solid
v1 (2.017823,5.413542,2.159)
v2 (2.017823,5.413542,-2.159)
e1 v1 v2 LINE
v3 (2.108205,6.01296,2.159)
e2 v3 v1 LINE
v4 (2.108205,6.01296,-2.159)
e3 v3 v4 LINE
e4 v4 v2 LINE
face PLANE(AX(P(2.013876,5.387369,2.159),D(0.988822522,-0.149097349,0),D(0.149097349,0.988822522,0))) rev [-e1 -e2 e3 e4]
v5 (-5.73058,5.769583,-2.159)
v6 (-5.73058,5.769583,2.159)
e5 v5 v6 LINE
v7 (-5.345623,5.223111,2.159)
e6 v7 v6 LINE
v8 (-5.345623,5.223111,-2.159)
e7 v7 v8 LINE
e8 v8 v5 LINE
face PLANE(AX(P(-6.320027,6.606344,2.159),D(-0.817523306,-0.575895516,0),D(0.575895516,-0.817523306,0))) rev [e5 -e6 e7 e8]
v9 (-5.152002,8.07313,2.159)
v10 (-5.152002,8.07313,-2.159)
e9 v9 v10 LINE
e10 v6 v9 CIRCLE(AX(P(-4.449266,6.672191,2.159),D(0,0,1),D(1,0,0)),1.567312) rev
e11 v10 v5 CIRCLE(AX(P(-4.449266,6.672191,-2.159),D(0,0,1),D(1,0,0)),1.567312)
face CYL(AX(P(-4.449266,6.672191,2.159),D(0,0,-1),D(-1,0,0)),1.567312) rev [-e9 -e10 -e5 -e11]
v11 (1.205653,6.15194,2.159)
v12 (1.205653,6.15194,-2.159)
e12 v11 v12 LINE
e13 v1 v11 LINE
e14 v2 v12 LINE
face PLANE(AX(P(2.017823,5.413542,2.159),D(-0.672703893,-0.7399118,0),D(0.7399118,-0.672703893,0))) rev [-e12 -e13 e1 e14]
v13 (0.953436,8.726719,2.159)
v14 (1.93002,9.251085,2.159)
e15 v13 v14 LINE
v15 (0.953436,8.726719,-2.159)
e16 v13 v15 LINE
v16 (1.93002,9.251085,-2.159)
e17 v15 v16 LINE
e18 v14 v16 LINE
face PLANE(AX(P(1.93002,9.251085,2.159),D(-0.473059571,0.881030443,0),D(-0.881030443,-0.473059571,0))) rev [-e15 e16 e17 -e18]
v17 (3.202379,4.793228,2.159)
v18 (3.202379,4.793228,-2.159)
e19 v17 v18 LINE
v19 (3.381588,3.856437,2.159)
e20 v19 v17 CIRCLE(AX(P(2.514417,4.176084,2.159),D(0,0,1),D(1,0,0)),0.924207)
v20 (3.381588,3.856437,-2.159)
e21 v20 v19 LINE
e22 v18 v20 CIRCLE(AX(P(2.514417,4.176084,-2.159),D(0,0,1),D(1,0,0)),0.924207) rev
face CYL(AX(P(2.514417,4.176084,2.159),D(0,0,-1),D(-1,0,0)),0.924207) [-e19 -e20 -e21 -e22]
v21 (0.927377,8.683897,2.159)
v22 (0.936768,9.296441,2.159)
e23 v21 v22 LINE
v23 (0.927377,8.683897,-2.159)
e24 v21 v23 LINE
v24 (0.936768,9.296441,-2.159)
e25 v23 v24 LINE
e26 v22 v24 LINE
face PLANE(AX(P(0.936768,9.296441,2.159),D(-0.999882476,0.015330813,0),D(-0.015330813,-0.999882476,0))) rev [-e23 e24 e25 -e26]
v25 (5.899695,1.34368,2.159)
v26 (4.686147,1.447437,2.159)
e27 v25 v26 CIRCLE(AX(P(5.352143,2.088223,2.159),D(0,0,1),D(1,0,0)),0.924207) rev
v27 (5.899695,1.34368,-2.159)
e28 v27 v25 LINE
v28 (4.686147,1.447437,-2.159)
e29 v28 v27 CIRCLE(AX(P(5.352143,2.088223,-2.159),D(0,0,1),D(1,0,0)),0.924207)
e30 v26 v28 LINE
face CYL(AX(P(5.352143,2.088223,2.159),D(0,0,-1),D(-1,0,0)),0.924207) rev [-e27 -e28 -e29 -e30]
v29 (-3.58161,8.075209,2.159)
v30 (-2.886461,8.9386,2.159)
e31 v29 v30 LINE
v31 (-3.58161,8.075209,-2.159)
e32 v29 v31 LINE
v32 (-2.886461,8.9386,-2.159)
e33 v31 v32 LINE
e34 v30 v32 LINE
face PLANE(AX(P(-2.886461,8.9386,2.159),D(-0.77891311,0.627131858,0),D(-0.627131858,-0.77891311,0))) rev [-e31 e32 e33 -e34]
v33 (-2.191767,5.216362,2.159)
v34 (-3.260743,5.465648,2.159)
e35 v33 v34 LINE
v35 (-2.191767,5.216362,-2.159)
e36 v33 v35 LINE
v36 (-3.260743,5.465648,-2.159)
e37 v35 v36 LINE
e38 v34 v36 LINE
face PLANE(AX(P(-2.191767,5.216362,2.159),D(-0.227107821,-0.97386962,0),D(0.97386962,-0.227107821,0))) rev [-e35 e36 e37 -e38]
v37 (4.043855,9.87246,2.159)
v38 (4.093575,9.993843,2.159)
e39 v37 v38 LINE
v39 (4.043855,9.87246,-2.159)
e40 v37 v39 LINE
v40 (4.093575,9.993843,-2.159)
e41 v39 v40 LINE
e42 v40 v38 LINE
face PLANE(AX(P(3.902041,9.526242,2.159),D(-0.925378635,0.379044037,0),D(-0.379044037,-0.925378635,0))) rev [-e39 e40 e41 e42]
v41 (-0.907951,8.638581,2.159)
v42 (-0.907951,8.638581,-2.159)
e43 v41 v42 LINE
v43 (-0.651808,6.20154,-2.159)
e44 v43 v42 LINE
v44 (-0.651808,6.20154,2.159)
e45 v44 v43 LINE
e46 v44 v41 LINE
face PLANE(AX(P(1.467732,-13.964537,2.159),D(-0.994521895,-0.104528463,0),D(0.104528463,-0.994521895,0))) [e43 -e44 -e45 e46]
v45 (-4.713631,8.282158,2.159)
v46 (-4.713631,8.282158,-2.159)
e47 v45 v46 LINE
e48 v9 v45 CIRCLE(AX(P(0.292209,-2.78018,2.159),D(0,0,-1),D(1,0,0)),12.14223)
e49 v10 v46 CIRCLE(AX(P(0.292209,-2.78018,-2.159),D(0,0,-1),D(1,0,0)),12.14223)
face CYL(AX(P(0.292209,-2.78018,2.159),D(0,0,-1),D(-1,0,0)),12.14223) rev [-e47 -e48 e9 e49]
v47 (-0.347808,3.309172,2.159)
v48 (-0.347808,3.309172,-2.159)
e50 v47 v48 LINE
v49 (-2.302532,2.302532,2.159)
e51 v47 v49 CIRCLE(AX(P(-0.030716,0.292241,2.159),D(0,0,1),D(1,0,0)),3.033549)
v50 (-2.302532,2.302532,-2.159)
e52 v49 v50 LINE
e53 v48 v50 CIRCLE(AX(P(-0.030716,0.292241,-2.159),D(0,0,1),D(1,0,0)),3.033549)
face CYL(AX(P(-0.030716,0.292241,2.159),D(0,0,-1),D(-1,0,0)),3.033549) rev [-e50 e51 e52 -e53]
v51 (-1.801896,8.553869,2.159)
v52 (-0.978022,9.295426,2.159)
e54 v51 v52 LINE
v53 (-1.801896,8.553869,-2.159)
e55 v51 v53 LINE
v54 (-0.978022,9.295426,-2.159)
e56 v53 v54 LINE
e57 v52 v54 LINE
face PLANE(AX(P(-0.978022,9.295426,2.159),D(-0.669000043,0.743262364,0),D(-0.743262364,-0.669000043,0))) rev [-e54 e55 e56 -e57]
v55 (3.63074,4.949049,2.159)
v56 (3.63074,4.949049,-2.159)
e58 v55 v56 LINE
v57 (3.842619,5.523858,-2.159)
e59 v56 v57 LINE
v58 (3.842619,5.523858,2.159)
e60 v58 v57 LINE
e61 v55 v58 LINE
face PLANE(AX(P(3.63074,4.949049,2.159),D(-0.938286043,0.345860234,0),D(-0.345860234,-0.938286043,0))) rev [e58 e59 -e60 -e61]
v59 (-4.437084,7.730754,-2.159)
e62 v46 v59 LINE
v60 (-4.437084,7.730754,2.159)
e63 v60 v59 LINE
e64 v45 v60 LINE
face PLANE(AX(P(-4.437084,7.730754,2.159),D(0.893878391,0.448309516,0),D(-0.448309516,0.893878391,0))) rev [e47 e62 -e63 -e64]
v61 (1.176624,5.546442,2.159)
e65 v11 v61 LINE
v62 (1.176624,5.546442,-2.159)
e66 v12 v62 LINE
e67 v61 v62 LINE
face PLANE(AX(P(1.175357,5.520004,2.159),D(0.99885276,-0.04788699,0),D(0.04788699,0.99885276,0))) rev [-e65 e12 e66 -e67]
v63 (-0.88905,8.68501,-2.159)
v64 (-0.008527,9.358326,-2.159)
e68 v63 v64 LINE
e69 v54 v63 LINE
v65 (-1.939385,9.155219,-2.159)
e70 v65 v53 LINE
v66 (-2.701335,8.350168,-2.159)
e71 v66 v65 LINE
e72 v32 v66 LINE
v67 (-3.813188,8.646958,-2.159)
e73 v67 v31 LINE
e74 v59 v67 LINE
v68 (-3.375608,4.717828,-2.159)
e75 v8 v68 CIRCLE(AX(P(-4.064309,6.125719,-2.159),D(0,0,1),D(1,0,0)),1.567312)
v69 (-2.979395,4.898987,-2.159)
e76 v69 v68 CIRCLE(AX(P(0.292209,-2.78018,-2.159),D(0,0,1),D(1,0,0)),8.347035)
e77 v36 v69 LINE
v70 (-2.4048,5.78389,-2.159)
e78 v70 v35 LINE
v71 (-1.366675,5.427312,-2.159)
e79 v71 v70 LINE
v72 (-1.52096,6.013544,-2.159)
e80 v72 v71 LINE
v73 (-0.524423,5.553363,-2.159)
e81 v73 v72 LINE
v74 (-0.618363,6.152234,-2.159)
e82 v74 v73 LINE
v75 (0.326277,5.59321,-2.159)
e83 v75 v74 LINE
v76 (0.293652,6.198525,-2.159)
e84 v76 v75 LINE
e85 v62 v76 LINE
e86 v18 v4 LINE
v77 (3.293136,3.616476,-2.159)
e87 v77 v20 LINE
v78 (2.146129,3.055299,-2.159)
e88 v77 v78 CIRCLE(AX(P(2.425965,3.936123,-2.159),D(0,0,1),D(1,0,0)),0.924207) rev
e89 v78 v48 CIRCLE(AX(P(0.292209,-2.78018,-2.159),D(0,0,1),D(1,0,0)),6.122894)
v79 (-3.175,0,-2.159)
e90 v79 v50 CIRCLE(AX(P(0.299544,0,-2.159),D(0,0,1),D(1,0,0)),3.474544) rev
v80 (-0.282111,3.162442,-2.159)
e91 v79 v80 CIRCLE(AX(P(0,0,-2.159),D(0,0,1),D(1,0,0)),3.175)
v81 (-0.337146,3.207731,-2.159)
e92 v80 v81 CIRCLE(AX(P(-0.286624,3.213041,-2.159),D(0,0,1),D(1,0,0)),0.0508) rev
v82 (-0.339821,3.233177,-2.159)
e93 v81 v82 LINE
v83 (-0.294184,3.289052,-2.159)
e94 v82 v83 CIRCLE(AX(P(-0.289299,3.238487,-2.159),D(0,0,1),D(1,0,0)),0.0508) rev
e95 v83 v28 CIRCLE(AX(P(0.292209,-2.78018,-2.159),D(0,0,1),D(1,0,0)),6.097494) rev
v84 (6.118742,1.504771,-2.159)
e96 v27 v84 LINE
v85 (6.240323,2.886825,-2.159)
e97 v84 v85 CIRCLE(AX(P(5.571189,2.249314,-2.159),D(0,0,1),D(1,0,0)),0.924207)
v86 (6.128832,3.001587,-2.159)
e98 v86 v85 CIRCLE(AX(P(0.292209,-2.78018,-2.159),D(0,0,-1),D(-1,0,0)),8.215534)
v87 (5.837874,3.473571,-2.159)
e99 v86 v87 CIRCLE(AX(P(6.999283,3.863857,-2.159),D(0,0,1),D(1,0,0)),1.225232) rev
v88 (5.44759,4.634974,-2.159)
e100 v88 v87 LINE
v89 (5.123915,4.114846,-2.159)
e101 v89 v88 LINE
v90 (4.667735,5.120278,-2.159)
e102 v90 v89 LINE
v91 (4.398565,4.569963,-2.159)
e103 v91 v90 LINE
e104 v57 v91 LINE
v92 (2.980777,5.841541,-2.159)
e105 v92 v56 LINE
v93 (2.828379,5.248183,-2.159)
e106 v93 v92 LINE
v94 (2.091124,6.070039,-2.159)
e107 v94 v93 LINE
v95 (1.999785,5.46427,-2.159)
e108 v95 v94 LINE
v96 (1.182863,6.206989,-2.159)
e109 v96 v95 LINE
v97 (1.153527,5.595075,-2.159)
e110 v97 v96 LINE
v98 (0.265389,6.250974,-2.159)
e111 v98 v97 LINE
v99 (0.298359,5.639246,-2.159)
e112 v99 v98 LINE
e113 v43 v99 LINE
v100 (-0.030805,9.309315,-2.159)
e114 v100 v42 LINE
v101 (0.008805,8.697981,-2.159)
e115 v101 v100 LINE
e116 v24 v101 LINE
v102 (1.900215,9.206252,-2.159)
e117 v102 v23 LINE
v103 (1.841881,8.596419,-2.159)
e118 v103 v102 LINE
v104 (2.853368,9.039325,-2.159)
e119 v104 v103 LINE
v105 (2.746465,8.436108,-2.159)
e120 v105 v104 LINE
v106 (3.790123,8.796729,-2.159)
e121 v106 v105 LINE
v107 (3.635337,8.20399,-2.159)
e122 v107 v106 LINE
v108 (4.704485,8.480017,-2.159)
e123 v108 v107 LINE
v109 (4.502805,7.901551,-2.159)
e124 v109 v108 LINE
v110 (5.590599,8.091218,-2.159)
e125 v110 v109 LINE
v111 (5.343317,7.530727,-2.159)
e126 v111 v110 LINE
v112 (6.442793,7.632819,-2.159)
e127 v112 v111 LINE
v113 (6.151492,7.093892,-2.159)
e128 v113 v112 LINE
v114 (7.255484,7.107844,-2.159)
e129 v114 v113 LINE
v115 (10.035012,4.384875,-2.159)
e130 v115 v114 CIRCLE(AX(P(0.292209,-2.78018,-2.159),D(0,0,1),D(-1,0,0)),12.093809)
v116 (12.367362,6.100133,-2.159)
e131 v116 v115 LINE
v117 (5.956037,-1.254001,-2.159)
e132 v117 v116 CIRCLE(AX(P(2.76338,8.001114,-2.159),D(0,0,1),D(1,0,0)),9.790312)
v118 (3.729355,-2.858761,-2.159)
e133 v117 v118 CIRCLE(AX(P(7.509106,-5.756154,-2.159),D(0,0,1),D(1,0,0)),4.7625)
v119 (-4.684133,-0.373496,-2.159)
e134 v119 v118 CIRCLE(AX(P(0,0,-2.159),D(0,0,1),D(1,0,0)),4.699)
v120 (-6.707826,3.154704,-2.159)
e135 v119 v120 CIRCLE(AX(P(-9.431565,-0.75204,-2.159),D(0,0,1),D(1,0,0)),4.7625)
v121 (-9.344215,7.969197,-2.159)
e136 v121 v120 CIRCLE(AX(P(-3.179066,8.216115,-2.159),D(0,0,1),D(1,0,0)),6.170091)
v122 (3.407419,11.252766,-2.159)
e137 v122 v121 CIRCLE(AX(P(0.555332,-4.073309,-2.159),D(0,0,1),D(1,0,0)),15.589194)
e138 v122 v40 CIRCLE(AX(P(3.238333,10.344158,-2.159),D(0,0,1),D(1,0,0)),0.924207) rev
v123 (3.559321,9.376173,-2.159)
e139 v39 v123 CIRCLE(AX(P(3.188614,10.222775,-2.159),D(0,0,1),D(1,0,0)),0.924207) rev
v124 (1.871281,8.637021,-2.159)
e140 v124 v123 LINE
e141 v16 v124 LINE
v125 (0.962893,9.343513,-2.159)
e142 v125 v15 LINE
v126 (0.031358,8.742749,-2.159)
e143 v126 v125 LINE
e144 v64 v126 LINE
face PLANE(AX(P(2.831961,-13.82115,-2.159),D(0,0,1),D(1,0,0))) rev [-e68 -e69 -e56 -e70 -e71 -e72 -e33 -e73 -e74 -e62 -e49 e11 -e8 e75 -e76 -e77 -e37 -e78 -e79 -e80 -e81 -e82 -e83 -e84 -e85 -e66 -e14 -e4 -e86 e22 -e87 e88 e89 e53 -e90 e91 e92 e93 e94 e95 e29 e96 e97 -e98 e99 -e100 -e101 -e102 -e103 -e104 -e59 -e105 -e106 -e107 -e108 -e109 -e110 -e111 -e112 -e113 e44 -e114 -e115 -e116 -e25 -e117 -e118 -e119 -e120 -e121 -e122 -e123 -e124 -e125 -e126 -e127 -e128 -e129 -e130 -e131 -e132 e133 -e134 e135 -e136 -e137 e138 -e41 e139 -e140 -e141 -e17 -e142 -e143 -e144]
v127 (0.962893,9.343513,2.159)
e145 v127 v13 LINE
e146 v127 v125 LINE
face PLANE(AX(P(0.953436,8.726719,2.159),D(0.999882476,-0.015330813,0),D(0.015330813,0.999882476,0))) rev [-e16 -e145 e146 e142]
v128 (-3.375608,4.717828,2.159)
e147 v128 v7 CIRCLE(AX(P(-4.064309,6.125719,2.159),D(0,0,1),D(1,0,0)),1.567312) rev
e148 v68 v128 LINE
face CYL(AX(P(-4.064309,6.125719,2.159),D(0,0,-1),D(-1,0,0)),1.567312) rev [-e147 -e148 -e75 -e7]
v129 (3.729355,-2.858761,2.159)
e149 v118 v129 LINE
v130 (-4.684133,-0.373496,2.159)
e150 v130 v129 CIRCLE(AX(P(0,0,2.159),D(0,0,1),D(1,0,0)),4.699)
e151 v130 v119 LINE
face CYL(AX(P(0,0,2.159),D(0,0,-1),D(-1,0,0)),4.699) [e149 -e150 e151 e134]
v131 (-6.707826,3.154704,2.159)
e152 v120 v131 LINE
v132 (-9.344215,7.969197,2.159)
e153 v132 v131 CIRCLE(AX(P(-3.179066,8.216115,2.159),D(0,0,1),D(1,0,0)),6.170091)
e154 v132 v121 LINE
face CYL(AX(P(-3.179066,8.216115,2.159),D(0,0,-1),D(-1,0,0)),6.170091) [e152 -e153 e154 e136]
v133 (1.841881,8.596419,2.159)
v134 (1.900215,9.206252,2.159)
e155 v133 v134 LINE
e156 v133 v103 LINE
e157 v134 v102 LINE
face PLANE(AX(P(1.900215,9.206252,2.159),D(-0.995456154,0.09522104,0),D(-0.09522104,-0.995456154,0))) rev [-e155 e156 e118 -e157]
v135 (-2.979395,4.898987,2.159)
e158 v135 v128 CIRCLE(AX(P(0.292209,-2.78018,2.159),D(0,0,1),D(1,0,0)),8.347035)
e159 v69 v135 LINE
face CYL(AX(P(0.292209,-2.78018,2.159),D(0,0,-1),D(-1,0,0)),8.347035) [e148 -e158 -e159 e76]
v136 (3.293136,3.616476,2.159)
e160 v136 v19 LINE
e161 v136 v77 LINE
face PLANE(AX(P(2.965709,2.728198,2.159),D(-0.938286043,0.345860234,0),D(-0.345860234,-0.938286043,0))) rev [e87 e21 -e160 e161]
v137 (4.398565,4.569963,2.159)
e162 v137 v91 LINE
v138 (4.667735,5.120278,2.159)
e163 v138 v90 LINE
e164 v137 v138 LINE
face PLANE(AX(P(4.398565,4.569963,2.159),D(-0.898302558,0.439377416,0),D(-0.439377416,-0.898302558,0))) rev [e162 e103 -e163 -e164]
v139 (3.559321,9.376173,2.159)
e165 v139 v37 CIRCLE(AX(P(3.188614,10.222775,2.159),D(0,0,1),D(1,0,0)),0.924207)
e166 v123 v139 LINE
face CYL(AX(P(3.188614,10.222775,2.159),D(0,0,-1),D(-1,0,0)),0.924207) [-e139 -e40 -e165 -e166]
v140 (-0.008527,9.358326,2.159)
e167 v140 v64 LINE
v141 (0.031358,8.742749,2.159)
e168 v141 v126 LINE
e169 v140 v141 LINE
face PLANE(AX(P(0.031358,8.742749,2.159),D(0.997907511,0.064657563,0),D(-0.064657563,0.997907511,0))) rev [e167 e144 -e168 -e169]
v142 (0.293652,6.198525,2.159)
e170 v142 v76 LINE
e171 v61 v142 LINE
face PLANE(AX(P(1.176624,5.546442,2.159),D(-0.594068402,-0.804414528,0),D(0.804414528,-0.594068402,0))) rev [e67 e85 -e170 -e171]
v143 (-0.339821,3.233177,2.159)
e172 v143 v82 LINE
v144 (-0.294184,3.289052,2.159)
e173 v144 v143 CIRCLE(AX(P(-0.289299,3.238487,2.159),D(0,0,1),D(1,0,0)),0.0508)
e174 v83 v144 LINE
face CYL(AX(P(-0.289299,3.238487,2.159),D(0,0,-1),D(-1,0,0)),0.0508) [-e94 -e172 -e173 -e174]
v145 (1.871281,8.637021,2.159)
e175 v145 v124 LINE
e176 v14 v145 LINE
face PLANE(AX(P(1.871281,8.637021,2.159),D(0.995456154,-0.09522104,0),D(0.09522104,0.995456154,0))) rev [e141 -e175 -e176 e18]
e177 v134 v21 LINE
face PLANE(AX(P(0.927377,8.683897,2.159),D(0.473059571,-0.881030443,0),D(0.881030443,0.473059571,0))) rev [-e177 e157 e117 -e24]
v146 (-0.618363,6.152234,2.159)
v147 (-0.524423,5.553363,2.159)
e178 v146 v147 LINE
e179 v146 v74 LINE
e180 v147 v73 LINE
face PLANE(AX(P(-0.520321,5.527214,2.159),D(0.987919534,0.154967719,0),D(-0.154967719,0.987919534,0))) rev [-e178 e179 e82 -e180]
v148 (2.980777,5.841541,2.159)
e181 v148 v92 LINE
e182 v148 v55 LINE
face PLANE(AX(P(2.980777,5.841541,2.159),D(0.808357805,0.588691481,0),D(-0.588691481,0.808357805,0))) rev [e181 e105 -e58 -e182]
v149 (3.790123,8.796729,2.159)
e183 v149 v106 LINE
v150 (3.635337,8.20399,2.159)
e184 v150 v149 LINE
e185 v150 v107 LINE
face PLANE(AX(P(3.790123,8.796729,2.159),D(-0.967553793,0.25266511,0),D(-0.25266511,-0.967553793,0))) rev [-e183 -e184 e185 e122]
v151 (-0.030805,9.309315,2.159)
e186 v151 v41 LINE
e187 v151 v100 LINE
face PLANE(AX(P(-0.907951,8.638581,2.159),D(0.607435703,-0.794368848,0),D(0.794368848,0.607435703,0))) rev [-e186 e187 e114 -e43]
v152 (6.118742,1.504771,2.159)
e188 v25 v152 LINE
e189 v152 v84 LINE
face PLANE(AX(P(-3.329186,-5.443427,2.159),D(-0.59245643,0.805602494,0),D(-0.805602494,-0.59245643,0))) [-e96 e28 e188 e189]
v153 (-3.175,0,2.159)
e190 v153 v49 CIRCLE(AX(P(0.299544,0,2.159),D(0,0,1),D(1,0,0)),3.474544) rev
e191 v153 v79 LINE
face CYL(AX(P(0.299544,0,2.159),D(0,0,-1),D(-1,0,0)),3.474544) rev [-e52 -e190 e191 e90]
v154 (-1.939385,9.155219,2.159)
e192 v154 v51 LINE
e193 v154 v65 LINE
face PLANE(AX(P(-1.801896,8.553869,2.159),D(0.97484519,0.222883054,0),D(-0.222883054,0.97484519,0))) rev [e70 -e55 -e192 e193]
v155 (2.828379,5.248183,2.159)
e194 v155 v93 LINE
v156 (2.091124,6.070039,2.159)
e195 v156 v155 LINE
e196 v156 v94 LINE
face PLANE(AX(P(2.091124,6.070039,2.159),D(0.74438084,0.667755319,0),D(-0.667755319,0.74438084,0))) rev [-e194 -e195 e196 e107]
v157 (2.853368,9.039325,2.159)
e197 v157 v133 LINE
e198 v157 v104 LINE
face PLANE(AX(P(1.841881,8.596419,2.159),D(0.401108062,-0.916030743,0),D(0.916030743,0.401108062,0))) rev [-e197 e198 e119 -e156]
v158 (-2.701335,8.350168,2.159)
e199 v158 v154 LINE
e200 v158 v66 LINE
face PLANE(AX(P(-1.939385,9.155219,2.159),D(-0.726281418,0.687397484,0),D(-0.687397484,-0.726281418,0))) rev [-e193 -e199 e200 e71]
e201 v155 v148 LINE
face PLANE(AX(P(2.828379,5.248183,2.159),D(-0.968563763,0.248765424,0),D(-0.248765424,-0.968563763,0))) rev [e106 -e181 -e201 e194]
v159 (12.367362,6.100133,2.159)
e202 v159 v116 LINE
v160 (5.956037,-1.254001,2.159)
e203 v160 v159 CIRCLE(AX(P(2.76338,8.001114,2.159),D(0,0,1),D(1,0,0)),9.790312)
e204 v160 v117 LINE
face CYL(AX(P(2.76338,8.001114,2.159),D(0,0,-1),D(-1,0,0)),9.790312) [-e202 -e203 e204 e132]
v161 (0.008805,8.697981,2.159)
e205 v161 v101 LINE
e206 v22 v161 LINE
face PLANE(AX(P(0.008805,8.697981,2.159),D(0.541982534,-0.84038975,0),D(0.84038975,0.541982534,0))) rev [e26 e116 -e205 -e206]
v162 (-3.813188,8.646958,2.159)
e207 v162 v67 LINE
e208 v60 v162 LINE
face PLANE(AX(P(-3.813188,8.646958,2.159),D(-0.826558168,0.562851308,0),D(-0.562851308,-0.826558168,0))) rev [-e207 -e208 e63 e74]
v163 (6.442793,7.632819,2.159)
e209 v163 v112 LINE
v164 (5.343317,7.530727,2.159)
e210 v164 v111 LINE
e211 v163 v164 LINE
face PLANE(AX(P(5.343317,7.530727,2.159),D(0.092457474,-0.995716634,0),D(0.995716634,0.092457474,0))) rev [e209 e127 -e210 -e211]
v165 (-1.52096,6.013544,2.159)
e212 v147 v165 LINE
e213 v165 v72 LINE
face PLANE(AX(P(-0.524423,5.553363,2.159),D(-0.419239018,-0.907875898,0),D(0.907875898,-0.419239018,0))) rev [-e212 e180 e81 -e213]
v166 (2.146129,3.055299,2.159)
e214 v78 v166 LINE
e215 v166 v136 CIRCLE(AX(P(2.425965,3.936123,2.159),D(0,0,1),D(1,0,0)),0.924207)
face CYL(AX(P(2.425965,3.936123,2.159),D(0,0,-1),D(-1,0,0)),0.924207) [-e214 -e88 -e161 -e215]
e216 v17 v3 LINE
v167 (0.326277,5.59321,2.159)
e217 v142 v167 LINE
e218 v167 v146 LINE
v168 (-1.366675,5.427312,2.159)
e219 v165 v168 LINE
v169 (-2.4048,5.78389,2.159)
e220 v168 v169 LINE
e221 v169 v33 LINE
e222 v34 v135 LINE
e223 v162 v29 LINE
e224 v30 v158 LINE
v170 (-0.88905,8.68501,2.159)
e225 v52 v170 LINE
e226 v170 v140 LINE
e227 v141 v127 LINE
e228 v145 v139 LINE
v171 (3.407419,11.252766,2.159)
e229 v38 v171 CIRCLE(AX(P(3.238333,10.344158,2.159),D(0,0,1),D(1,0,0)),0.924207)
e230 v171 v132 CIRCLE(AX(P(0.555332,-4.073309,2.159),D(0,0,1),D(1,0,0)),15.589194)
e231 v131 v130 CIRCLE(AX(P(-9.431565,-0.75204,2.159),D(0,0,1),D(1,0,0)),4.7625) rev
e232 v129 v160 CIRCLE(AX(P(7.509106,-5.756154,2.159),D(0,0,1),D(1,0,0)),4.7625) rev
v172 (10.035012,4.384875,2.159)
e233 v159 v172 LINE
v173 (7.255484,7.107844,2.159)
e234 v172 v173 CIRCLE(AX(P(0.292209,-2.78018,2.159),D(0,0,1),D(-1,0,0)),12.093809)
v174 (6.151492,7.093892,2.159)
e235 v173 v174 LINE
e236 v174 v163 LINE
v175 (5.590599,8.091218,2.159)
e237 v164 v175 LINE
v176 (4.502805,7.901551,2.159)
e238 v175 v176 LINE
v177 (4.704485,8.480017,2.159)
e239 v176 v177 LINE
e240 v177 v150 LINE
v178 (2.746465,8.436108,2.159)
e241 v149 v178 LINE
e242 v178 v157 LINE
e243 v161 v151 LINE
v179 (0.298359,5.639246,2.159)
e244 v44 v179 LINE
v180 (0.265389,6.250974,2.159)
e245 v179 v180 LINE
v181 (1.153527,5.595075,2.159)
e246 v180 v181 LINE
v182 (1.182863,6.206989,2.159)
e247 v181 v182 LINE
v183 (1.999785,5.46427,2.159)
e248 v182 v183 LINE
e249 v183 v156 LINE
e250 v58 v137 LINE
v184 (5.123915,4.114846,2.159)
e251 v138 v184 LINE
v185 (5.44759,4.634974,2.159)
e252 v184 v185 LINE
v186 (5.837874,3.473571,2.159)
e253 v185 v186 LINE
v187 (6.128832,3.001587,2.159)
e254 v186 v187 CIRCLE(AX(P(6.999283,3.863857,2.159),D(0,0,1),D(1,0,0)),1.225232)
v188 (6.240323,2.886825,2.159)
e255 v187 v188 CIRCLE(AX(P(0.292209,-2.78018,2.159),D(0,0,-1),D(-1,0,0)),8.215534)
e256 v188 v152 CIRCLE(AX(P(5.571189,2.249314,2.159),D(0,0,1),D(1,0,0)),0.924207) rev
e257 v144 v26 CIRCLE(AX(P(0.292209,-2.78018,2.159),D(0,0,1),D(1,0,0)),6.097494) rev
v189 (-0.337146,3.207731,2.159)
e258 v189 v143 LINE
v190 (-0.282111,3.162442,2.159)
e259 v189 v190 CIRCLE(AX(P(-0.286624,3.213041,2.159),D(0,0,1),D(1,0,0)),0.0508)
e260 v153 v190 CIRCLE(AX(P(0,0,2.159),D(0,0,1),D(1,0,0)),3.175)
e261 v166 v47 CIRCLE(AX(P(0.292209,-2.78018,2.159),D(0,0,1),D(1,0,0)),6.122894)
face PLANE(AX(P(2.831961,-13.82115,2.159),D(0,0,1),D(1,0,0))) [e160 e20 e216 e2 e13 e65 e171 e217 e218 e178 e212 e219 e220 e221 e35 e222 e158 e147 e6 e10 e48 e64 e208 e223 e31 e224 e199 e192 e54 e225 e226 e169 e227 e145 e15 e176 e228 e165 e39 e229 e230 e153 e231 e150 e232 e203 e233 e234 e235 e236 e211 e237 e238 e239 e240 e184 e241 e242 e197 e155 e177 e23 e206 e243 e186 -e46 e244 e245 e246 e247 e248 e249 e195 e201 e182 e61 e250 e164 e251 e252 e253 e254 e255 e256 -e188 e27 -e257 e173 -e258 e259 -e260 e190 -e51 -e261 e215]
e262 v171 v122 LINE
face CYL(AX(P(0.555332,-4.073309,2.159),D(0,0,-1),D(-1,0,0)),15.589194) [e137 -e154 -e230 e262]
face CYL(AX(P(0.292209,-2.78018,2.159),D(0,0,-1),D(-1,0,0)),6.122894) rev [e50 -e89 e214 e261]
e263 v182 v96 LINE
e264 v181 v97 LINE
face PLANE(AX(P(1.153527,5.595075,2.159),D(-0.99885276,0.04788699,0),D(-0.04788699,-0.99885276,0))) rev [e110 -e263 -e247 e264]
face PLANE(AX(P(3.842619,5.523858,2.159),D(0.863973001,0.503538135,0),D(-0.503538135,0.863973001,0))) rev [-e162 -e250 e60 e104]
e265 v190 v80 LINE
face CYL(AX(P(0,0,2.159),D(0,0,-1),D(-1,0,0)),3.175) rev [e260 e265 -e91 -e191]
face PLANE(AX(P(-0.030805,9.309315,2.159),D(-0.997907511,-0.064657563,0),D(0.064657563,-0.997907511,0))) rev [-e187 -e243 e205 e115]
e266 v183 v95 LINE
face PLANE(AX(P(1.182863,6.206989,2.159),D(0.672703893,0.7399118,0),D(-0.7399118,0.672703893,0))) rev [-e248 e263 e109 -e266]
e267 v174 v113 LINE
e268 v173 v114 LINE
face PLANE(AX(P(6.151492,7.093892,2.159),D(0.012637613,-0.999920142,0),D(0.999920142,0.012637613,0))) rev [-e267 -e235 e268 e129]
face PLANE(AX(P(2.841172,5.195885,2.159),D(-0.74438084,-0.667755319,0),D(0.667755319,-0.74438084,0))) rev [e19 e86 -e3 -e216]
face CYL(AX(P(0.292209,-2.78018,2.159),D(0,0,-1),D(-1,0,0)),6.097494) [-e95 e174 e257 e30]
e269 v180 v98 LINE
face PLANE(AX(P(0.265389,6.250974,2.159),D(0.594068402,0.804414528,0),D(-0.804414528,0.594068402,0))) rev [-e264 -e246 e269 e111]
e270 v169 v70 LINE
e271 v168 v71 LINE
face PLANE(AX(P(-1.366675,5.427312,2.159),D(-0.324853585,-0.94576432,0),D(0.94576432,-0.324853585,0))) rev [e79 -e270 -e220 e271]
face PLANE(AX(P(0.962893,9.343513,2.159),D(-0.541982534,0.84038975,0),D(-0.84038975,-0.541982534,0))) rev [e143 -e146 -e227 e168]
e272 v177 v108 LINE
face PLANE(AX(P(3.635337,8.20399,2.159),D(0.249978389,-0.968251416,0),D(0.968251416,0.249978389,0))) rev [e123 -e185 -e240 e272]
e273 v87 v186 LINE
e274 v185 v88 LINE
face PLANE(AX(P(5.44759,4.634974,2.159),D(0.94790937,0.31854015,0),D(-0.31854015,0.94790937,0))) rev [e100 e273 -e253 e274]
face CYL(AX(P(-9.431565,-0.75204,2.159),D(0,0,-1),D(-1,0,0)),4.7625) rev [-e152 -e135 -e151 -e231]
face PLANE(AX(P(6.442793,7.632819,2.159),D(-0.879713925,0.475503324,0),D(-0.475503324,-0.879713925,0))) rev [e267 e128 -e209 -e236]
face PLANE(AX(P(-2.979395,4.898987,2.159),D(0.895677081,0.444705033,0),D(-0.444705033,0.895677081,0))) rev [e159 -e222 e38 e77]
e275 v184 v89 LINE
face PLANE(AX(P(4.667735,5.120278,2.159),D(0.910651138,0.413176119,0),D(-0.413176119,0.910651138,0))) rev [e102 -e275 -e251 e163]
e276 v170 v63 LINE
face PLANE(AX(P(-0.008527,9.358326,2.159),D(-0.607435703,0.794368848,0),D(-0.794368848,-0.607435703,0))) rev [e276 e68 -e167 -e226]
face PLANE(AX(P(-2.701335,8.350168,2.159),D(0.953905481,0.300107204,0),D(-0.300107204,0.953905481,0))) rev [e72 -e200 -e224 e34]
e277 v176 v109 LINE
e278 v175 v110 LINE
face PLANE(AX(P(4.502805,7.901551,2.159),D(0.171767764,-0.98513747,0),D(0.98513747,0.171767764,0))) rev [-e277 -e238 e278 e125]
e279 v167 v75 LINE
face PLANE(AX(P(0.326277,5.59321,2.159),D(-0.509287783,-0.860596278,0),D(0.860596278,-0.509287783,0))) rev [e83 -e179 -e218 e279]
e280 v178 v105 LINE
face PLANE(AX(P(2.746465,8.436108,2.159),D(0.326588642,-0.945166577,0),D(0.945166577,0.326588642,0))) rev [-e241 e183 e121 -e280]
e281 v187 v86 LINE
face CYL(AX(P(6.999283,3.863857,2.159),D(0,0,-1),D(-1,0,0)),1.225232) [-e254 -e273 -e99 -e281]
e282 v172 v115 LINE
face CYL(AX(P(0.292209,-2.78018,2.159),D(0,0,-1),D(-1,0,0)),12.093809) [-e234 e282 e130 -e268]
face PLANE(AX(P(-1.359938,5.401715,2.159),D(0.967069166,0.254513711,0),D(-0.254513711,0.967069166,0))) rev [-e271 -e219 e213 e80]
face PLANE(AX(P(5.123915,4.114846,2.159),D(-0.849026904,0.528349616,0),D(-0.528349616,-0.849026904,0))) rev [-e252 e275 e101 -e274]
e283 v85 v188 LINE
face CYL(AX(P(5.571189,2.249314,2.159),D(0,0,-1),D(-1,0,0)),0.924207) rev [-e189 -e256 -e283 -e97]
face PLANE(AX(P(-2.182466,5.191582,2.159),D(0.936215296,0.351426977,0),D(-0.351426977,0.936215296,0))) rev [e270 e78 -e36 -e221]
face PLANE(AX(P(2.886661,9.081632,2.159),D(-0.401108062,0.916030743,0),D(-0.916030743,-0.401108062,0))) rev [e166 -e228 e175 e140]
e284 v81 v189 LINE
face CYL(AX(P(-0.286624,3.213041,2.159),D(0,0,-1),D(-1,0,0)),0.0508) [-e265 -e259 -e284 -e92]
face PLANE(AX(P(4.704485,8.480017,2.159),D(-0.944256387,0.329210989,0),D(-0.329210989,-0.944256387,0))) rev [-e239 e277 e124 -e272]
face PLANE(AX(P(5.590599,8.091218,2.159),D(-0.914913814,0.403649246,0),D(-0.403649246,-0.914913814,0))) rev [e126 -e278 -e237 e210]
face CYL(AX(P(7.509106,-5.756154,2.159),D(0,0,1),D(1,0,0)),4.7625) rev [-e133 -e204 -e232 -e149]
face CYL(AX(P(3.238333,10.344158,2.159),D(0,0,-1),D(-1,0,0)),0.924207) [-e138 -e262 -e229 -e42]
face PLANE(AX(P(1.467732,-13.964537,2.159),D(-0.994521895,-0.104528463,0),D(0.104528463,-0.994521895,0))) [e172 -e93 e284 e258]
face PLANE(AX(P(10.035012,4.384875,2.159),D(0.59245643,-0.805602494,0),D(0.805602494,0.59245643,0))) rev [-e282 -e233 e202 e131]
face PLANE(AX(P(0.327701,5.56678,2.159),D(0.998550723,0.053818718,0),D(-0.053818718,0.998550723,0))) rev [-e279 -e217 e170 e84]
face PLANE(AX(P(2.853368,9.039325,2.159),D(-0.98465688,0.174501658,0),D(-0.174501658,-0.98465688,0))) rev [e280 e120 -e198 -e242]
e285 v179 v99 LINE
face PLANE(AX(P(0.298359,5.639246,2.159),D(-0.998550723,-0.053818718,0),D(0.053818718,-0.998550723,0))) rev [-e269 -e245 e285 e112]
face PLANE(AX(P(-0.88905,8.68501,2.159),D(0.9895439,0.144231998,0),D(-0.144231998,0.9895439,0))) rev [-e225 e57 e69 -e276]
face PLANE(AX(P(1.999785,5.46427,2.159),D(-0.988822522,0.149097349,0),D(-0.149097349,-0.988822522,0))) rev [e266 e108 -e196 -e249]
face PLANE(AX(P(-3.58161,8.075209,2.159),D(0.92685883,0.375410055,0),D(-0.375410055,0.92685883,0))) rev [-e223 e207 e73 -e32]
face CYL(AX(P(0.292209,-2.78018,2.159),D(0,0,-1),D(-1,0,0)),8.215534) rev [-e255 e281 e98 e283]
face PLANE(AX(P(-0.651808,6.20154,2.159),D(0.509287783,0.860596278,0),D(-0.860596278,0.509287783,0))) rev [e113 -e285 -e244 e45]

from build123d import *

# Parameters (mm, degrees)
BOSS_EXTRUDE1_DEPTH  = 2.159
BOSS_EXTRUDE2_DEPTH  = 2.159
CRVPATTERN14_START   = -2.159
CRVPATTERN14_DEPTH   = 4.318
BOSS_EXTRUDE3_DEPTH  = 2.159
BOSS_EXTRUDE12_START = -2.159
BOSS_EXTRUDE12_DEPTH = 4.318
BOSS_EXTRUDE4_DEPTH  = 2.159
CRVPATTERN15_START   = -2.159
CRVPATTERN15_DEPTH   = 4.318
BOSS_EXTRUDE6_DEPTH  = 2.159
BOSS_EXTRUDE8_DEPTH  = 2.159
FILLET6_R            = 1.2252325
BOSS_EXTRUDE7_DEPTH  = 2.159
CRVPATTERN16_COUNT   = 8
CRVPATTERN16_ANGLE   = 32.099318005
BOSS_EXTRUDE9_DEPTH  = 2.159
BOSS_EXTRUDE10_DEPTH = 2.159
CRVPATTERN17_START   = -2.159
CRVPATTERN17_DEPTH   = 4.318
FILLET7_R            = 1.56731187
BOSS_EXTRUDE11_DEPTH = 2.159
FILLET5_R            = 0.924207216
FILLET4_R            = 0.0508
FILLET8_R            = 4.7625


# Read off the part's stored shape, not the designer's step: CrvPattern14, CrvPattern15, CrvPattern17
with BuildPart() as part:
    # Sketch2 → Boss-Extrude1 (new, symmetric)
    with BuildSketch(Plane.XY):
        with BuildLine():
            Line((-0.345152986, 3.283911299), (-0.331877871, 3.157607018))
            ThreePointArc((-0.331877871, 3.157607018), (2.359484821, -2.124489675), (-3.175, 0))
            ThreePointArc((-3.175, 0), (-3.075214252, 0.826718033), (-2.78158852, 1.605950881))
            Line((-2.78158852, 1.605950881), (-4.069453372, 2.3495))
            ThreePointArc((-4.069453372, 2.3495), (-2.00731761, -4.248679443), (4.399194849, -1.65157067))
            Line((4.399194849, -1.65157067), (10.362922249, 2.734275533))
            ThreePointArc((10.362922249, 2.734275533), (9.973832009, 3.391907291), (9.541861687, 4.022202765))
            ThreePointArc((9.541861687, 4.022202765), (4.931855371, 7.722304078), (-0.907951479, 8.638581279))
            Line((-0.907951479, 8.638581279), (-0.651808138, 6.201540183))
            ThreePointArc((-0.651808138, 6.201540183), (3.941642024, 5.480818802), (7.56776097, 2.57040902))
            Line((7.56776097, 2.57040902), (5.204364932, 0.832319593))
            ThreePointArc((5.204364932, 0.832319593), (2.756157271, 2.797309609), (-0.345152986, 3.283911299))
        make_face()
    extrude(amount=BOSS_EXTRUDE1_DEPTH, both=True)

    # Sketch3 → Boss-Extrude2 (add, symmetric)
    with BuildSketch(Plane.XY):
        Polygon((-0.651808138, 6.201540183), (0.298358904, 5.639245785), (0.265388682, 6.250974184), (-0.392244602, 6.640151555), align=None)
    extrude(amount=BOSS_EXTRUDE2_DEPTH, both=True)

    # CrvPattern14 outline → CrvPattern14 (add)
    with BuildSketch(Plane.XY.offset(CRVPATTERN14_START)):
        with BuildLine():
            ThreePointArc((6.174117189, 4.072966487), (5.818003264, 4.363212667), (5.447590186, 4.634973821))
            Line((5.447590186, 4.634973821), (5.799283959, 3.588406151))
            Line((5.799283959, 3.588406151), (6.174117189, 4.072966487))
        make_face()
        with BuildLine():
            ThreePointArc((5.447590186, 4.634973821), (5.063836478, 4.88754671), (4.667735183, 5.120277749))
            Line((4.667735183, 5.120277749), (5.123914626, 4.114846143))
            Line((5.123914626, 4.114846143), (5.447590186, 4.634973821))
        make_face()
        with BuildLine():
            ThreePointArc((4.667735183, 5.120277749), (4.260311296, 5.332564697), (3.842619111, 5.523858218))
            Line((3.842619111, 5.523858218), (4.398565438, 4.569963004))
            Line((4.398565438, 4.569963004), (4.667735183, 5.120277749))
        make_face()
        with BuildLine():
            ThreePointArc((3.842619111, 5.523858218), (3.415739494, 5.693663299), (2.980777087, 5.841540535))
            Line((2.980777087, 5.841540535), (3.630739511, 4.949048941))
            Line((3.630739511, 4.949048941), (3.842619111, 5.523858218))
        make_face()
        with BuildLine():
            ThreePointArc((2.980777087, 5.841540535), (2.538857445, 5.967107261), (2.091124129, 6.070038548))
            Line((2.091124129, 6.070038548), (2.828379346, 5.248182634))
            Line((2.828379346, 5.248182634), (2.980777087, 5.841540535))
        make_face()
        with BuildLine():
            ThreePointArc((2.091124129, 6.070038548), (1.638735742, 6.150068039), (1.182862933, 6.206988641))
            Line((1.182862933, 6.206988641), (1.99978467, 5.464269802))
            Line((1.99978467, 5.464269802), (2.091124129, 6.070038548))
        make_face()
        with BuildLine():
            Line((0.265388682, 6.250974184), (1.153526584, 5.595075209))
            Line((1.153526584, 5.595075209), (1.182862933, 6.206988641))
            ThreePointArc((1.182862933, 6.206988641), (0.72468537, 6.240653061), (0.265388682, 6.250974184))
        make_face()
    extrude(amount=CRVPATTERN14_DEPTH)

    # Sketch6 → Boss-Extrude3 (add, symmetric)
    with BuildSketch(Plane.XY):
        with BuildLine():
            Line((-5.795109436, 2.930998085), (-4.193189288, 2.120793388))
            Line((-4.193189288, 2.120793388), (-2.78158852, 1.605950881))
            ThreePointArc((-2.78158852, 1.605950881), (-2.563325524, 1.968866129), (-2.302532257, 2.302532257))
            ThreePointArc((-2.302532257, 2.302532257), (-1.419579718, 2.989179637), (-0.347808009, 3.309172155))
            ThreePointArc((-0.347808009, 3.309172155), (0.982394739, 3.303690003), (2.280021634, 3.011057396))
            Line((2.280021634, 3.011057396), (2.834587117, 5.170248259))
            ThreePointArc((2.834587117, 5.170248259), (1.69609872, 5.447948005), (0.529939284, 5.563469196))
            ThreePointArc((0.529939284, 5.563469196), (-2.556537552, 5.065687863), (-5.243376004, 3.467243416))
            ThreePointArc((-5.243376004, 3.467243416), (-5.525424614, 3.205481193), (-5.795109436, 2.930998085))
        make_face()
    extrude(amount=BOSS_EXTRUDE3_DEPTH, both=True)

    # Sketch24 → Boss-Extrude12 (add)
    with BuildSketch(Plane.XY.offset(BOSS_EXTRUDE12_START)):
        with BuildLine():
            Line((-4.220330333, 2.13452054), (-2.859660878, 1.446333438))
            ThreePointArc((-2.859660878, 1.446333438), (-3.095249982, 0.74015525), (-3.175, 0))
            Line((-3.175, 0), (-4.699, 0))
            ThreePointArc((-4.699, 0), (-4.577864782, 1.093766724), (-4.220330333, 2.13452054))
        make_face()
    extrude(amount=BOSS_EXTRUDE12_DEPTH)

    # Sketch7 → Boss-Extrude4 (add, symmetric)
    with BuildSketch(Plane.XY):
        Polygon((2.841171549, 5.195884629), (2.108204785, 6.012959986), (2.013876484, 5.387369061), (1.956921428, 5.009639728), (2.76215236, 4.888224818), align=None)
    extrude(amount=BOSS_EXTRUDE4_DEPTH, both=True)

    # CrvPattern15 outline → CrvPattern15 (add)
    with BuildSketch(Plane.XY.offset(CRVPATTERN15_START)):
        with BuildLine():
            Line((-3.260742946, 5.465648477), (-2.97939475, 4.898987179))
            ThreePointArc((-2.97939475, 4.898987179), (-0.520320905, 5.527213901), (2.013876484, 5.387369061))
            Line((2.013876484, 5.387369061), (2.017822858, 5.413541649))
            Line((2.017822858, 5.413541649), (1.205652977, 6.151940254))
            Line((1.205652977, 6.151940254), (1.176624168, 5.546441646))
            Line((1.176624168, 5.546441646), (0.293652371, 6.1985254))
            Line((0.293652371, 6.1985254), (0.326276958, 5.593209885))
            Line((0.326276958, 5.593209885), (-0.61836317, 6.152233539))
            Line((-0.61836317, 6.152233539), (-0.524422659, 5.553362588))
            Line((-0.524422659, 5.553362588), (-1.520959625, 6.013543523))
            Line((-1.520959625, 6.013543523), (-1.366674925, 5.427311941))
            Line((-1.366674925, 5.427311941), (-2.404800409, 5.783889979))
            Line((-2.404800409, 5.783889979), (-2.191767463, 5.21636183))
            Line((-2.191767463, 5.21636183), (-3.260742946, 5.465648477))
        make_face()
    extrude(amount=CRVPATTERN15_DEPTH)

    # Sketch15 → Boss-Extrude6 (add, symmetric)
    with BuildSketch(Plane.XY):
        with BuildLine():
            Line((6.174117189, 4.072966487), (5.799283959, 3.588406151))
            Line((5.799283959, 3.588406151), (5.931866036, 3.193869408))
            ThreePointArc((5.931866036, 3.193869408), (6.446193236, 2.662565202), (6.910663393, 2.087166122))
            Line((6.910663393, 2.087166122), (7.56776097, 2.57040902))
            ThreePointArc((7.56776097, 2.57040902), (6.91369744, 3.361346752), (6.174117189, 4.072966487))
        make_face()
    extrude(amount=BOSS_EXTRUDE6_DEPTH, both=True)

    # Sketch20 → Boss-Extrude8 (add, symmetric)
    with BuildSketch(Plane.XY):
        with BuildLine():
            Line((2.841171549, 5.195884629), (3.574138313, 4.378809272))
            Line((3.574138313, 4.378809272), (2.9657089, 2.728197927))
            ThreePointArc((2.9657089, 2.728197927), (2.627152469, 2.880020383), (2.280021634, 3.011057396))
            Line((2.280021634, 3.011057396), (2.841171549, 5.195884629))
        make_face()
    extrude(amount=BOSS_EXTRUDE8_DEPTH, both=True)

    # Fillet6
    fillet6_edges = [part.edges().sort_by_distance(p)[0] for p in [
        (5.931866036, 3.193869408, 0),
    ]]
    fillet(fillet6_edges, radius=FILLET6_R)

    # Sketch16 → Boss-Extrude7 (add, symmetric)
    with BuildSketch(Plane.XY):
        Polygon((-0.907951479, 8.638581279), (-0.03080494, 9.30931519), (0.008805334, 8.697980833), (-0.59835021, 8.233702866), align=None)
    boss_extrude7 = extrude(amount=BOSS_EXTRUDE7_DEPTH, both=True)

    # CrvPattern16: Boss-Extrude7 ×8 about axis
    crvpattern16_axis = Axis((0.292208676, -2.780179842, 0), (0, 0, -1))
    for i in range(1, CRVPATTERN16_COUNT):
        add(boss_extrude7.rotate(crvpattern16_axis, i * CRVPATTERN16_ANGLE / (CRVPATTERN16_COUNT - 1)))

    # Sketch21 → Boss-Extrude9 (add, symmetric)
    with BuildSketch(Plane.XY):
        with BuildLine():
            Line((-6.320027167, 6.606343854), (-4.514811412, 4.043715892))
            ThreePointArc((-4.514811412, 4.043715892), (-5.183299194, 3.519963702), (-5.795109436, 2.930998085))
            Line((-5.795109436, 2.930998085), (-9.344214544, 7.969196961))
            ThreePointArc((-9.344214544, 7.969196961), (-3.396900447, 11.006572804), (3.275672454, 11.276698424))
            Line((3.275672454, 11.276698424), (2.886661012, 9.081631647))
            ThreePointArc((2.886661012, 9.081631647), (0.963406298, 9.34348497), (-0.976999989, 9.295533971))
            ThreePointArc((-0.976999989, 9.295533971), (-3.976201015, 8.587072836), (-6.700447257, 7.146376345))
            Line((-6.700447257, 7.146376345), (-6.320027167, 6.606343854))
        make_face()
    extrude(amount=BOSS_EXTRUDE9_DEPTH, both=True)

    # Sketch22 → Boss-Extrude10 (add, symmetric)
    with BuildSketch(Plane.XY):
        Polygon((2.886661012, 9.081631647), (2.670487492, 9.575318036), (1.930019742, 9.251084831), (1.871281039, 8.637020922), align=None)
    extrude(amount=BOSS_EXTRUDE10_DEPTH, both=True)

    # CrvPattern17 outline → CrvPattern17 (add)
    with BuildSketch(Plane.XY.offset(CRVPATTERN17_START)):
        with BuildLine():
            Line((-4.437083666, 7.73075431), (-3.813187634, 8.646957851))
            ThreePointArc((-3.813187634, 8.646957851), (-4.26705933, 8.473567533), (-4.713630949, 8.282158264))
            Line((-4.713630949, 8.282158264), (-4.437083666, 7.73075431))
        make_face()
        with BuildLine():
            Line((-3.581609613, 8.075209357), (-2.886461405, 8.938600437))
            ThreePointArc((-2.886461405, 8.938600437), (-3.352742578, 8.802051596), (-3.813187634, 8.646957851))
            Line((-3.813187634, 8.646957851), (-3.581609613, 8.075209357))
        make_face()
        with BuildLine():
            Line((-2.701335217, 8.350167761), (-1.939385201, 9.155218915))
            ThreePointArc((-1.939385201, 9.155218915), (-2.415090701, 9.056385741), (-2.886461405, 8.938600437))
            Line((-2.886461405, 8.938600437), (-2.701335217, 8.350167761))
        make_face()
        with BuildLine():
            Line((-1.801896032, 8.553869226), (-0.978022242, 9.295426484))
            ThreePointArc((-0.978022242, 9.295426484), (-1.460106582, 9.234941712), (-1.939385201, 9.155218915))
            Line((-1.939385201, 9.155218915), (-1.801896032, 8.553869226))
        make_face()
        with BuildLine():
            Line((-0.889050303, 8.685009647), (-0.008527213, 9.358325529))
            ThreePointArc((-0.008527213, 9.358325529), (-0.49390407, 9.336576385), (-0.978022242, 9.295426484))
            Line((-0.978022242, 9.295426484), (-0.889050303, 8.685009647))
        make_face()
        with BuildLine():
            Line((0.031357894, 8.742749459), (0.962893139, 9.343513369))
            ThreePointArc((0.962893139, 9.343513369), (0.477331168, 9.360639092), (-0.008527213, 9.358325529))
            Line((-0.008527213, 9.358325529), (0.031357894, 8.742749459))
        make_face()
        with BuildLine():
            Line((0.953436069, 8.726719008), (1.930019742, 9.251084831))
            ThreePointArc((1.930019742, 9.251084831), (1.447381243, 9.306975781), (0.962893139, 9.343513369))
            Line((0.962893139, 9.343513369), (0.953436069, 8.726719008))
        make_face()
    extrude(amount=CRVPATTERN17_DEPTH)

    # Fillet7
    fillet7_edges = [part.edges().sort_by_distance(p)[0] for p in [
        (-4.514811412, 4.043715892, 0),
        (-6.700447257, 7.146376345, 0),
    ]]
    fillet(fillet7_edges, radius=FILLET7_R)

    # Sketch23 → Boss-Extrude11 (add, symmetric)
    with BuildSketch(Plane.XY):
        with BuildLine():
            Line((10.362922249, 2.734275533), (4.399194849, -1.65157067))
            ThreePointArc((4.399194849, -1.65157067), (9.590201078, 0.983655797), (12.367362142, 6.100133162))
            Line((12.367362142, 6.100133162), (10.035011768, 4.384875346))
            ThreePointArc((10.035011768, 4.384875346), (8.755476597, 5.858878211), (7.255483957, 7.107844495))
            Line((7.255483957, 7.107844495), (6.151492239, 7.093891561))
            ThreePointArc((6.151492239, 7.093891561), (8.550099761, 5.197020468), (10.362922249, 2.734275533))
        make_face()
        with BuildLine():
            Line((2.886661012, 9.081631647), (3.902040986, 9.526242372))
            Line((3.902040986, 9.526242372), (4.508317815, 11.00637547))
            ThreePointArc((4.508317815, 11.00637547), (3.894731572, 11.154014824), (3.275672454, 11.276698424))
            Line((3.275672454, 11.276698424), (2.886661012, 9.081631647))
        make_face()
        with BuildLine():
            Line((-9.344214544, 7.969196961), (-5.795109436, 2.930998085))
            Line((-5.795109436, 2.930998085), (-4.220330333, 2.13452054))
            ThreePointArc((-4.220330333, 2.13452054), (-7.815223836, 4.144743604), (-9.344214544, 7.969196961))
        make_face()
    extrude(amount=BOSS_EXTRUDE11_DEPTH, both=True)

    # Fillet5
    fillet5_edges = [part.edges().sort_by_distance(p)[0] for p in [
        (5.204364932, 0.832319593, 0),
        (6.910663393, 2.087166122, 0),
        (2.9657089, 2.728197927, 0),
        (3.574138313, 4.378809272, 0),
        (4.508317815, 11.00637547, 0),
        (3.902040986, 9.526242372, 0),
    ]]
    fillet(fillet5_edges, radius=FILLET5_R)

    # Fillet4
    fillet4_edges = [part.edges().sort_by_distance(p)[0] for p in [
        (-0.331877871, 3.157607018, 0),
        (-0.345152986, 3.283911299, 0),
    ]]
    fillet(fillet4_edges, radius=FILLET4_R)

    # Fillet8
    fillet8_edges = [part.edges().sort_by_distance(p)[0] for p in [
        (4.399194849, -1.65157067, 0),
        (-4.220330333, 2.13452054, 0),
    ]]
    fillet(fillet8_edges, radius=FILLET8_R)


solid = part.part
